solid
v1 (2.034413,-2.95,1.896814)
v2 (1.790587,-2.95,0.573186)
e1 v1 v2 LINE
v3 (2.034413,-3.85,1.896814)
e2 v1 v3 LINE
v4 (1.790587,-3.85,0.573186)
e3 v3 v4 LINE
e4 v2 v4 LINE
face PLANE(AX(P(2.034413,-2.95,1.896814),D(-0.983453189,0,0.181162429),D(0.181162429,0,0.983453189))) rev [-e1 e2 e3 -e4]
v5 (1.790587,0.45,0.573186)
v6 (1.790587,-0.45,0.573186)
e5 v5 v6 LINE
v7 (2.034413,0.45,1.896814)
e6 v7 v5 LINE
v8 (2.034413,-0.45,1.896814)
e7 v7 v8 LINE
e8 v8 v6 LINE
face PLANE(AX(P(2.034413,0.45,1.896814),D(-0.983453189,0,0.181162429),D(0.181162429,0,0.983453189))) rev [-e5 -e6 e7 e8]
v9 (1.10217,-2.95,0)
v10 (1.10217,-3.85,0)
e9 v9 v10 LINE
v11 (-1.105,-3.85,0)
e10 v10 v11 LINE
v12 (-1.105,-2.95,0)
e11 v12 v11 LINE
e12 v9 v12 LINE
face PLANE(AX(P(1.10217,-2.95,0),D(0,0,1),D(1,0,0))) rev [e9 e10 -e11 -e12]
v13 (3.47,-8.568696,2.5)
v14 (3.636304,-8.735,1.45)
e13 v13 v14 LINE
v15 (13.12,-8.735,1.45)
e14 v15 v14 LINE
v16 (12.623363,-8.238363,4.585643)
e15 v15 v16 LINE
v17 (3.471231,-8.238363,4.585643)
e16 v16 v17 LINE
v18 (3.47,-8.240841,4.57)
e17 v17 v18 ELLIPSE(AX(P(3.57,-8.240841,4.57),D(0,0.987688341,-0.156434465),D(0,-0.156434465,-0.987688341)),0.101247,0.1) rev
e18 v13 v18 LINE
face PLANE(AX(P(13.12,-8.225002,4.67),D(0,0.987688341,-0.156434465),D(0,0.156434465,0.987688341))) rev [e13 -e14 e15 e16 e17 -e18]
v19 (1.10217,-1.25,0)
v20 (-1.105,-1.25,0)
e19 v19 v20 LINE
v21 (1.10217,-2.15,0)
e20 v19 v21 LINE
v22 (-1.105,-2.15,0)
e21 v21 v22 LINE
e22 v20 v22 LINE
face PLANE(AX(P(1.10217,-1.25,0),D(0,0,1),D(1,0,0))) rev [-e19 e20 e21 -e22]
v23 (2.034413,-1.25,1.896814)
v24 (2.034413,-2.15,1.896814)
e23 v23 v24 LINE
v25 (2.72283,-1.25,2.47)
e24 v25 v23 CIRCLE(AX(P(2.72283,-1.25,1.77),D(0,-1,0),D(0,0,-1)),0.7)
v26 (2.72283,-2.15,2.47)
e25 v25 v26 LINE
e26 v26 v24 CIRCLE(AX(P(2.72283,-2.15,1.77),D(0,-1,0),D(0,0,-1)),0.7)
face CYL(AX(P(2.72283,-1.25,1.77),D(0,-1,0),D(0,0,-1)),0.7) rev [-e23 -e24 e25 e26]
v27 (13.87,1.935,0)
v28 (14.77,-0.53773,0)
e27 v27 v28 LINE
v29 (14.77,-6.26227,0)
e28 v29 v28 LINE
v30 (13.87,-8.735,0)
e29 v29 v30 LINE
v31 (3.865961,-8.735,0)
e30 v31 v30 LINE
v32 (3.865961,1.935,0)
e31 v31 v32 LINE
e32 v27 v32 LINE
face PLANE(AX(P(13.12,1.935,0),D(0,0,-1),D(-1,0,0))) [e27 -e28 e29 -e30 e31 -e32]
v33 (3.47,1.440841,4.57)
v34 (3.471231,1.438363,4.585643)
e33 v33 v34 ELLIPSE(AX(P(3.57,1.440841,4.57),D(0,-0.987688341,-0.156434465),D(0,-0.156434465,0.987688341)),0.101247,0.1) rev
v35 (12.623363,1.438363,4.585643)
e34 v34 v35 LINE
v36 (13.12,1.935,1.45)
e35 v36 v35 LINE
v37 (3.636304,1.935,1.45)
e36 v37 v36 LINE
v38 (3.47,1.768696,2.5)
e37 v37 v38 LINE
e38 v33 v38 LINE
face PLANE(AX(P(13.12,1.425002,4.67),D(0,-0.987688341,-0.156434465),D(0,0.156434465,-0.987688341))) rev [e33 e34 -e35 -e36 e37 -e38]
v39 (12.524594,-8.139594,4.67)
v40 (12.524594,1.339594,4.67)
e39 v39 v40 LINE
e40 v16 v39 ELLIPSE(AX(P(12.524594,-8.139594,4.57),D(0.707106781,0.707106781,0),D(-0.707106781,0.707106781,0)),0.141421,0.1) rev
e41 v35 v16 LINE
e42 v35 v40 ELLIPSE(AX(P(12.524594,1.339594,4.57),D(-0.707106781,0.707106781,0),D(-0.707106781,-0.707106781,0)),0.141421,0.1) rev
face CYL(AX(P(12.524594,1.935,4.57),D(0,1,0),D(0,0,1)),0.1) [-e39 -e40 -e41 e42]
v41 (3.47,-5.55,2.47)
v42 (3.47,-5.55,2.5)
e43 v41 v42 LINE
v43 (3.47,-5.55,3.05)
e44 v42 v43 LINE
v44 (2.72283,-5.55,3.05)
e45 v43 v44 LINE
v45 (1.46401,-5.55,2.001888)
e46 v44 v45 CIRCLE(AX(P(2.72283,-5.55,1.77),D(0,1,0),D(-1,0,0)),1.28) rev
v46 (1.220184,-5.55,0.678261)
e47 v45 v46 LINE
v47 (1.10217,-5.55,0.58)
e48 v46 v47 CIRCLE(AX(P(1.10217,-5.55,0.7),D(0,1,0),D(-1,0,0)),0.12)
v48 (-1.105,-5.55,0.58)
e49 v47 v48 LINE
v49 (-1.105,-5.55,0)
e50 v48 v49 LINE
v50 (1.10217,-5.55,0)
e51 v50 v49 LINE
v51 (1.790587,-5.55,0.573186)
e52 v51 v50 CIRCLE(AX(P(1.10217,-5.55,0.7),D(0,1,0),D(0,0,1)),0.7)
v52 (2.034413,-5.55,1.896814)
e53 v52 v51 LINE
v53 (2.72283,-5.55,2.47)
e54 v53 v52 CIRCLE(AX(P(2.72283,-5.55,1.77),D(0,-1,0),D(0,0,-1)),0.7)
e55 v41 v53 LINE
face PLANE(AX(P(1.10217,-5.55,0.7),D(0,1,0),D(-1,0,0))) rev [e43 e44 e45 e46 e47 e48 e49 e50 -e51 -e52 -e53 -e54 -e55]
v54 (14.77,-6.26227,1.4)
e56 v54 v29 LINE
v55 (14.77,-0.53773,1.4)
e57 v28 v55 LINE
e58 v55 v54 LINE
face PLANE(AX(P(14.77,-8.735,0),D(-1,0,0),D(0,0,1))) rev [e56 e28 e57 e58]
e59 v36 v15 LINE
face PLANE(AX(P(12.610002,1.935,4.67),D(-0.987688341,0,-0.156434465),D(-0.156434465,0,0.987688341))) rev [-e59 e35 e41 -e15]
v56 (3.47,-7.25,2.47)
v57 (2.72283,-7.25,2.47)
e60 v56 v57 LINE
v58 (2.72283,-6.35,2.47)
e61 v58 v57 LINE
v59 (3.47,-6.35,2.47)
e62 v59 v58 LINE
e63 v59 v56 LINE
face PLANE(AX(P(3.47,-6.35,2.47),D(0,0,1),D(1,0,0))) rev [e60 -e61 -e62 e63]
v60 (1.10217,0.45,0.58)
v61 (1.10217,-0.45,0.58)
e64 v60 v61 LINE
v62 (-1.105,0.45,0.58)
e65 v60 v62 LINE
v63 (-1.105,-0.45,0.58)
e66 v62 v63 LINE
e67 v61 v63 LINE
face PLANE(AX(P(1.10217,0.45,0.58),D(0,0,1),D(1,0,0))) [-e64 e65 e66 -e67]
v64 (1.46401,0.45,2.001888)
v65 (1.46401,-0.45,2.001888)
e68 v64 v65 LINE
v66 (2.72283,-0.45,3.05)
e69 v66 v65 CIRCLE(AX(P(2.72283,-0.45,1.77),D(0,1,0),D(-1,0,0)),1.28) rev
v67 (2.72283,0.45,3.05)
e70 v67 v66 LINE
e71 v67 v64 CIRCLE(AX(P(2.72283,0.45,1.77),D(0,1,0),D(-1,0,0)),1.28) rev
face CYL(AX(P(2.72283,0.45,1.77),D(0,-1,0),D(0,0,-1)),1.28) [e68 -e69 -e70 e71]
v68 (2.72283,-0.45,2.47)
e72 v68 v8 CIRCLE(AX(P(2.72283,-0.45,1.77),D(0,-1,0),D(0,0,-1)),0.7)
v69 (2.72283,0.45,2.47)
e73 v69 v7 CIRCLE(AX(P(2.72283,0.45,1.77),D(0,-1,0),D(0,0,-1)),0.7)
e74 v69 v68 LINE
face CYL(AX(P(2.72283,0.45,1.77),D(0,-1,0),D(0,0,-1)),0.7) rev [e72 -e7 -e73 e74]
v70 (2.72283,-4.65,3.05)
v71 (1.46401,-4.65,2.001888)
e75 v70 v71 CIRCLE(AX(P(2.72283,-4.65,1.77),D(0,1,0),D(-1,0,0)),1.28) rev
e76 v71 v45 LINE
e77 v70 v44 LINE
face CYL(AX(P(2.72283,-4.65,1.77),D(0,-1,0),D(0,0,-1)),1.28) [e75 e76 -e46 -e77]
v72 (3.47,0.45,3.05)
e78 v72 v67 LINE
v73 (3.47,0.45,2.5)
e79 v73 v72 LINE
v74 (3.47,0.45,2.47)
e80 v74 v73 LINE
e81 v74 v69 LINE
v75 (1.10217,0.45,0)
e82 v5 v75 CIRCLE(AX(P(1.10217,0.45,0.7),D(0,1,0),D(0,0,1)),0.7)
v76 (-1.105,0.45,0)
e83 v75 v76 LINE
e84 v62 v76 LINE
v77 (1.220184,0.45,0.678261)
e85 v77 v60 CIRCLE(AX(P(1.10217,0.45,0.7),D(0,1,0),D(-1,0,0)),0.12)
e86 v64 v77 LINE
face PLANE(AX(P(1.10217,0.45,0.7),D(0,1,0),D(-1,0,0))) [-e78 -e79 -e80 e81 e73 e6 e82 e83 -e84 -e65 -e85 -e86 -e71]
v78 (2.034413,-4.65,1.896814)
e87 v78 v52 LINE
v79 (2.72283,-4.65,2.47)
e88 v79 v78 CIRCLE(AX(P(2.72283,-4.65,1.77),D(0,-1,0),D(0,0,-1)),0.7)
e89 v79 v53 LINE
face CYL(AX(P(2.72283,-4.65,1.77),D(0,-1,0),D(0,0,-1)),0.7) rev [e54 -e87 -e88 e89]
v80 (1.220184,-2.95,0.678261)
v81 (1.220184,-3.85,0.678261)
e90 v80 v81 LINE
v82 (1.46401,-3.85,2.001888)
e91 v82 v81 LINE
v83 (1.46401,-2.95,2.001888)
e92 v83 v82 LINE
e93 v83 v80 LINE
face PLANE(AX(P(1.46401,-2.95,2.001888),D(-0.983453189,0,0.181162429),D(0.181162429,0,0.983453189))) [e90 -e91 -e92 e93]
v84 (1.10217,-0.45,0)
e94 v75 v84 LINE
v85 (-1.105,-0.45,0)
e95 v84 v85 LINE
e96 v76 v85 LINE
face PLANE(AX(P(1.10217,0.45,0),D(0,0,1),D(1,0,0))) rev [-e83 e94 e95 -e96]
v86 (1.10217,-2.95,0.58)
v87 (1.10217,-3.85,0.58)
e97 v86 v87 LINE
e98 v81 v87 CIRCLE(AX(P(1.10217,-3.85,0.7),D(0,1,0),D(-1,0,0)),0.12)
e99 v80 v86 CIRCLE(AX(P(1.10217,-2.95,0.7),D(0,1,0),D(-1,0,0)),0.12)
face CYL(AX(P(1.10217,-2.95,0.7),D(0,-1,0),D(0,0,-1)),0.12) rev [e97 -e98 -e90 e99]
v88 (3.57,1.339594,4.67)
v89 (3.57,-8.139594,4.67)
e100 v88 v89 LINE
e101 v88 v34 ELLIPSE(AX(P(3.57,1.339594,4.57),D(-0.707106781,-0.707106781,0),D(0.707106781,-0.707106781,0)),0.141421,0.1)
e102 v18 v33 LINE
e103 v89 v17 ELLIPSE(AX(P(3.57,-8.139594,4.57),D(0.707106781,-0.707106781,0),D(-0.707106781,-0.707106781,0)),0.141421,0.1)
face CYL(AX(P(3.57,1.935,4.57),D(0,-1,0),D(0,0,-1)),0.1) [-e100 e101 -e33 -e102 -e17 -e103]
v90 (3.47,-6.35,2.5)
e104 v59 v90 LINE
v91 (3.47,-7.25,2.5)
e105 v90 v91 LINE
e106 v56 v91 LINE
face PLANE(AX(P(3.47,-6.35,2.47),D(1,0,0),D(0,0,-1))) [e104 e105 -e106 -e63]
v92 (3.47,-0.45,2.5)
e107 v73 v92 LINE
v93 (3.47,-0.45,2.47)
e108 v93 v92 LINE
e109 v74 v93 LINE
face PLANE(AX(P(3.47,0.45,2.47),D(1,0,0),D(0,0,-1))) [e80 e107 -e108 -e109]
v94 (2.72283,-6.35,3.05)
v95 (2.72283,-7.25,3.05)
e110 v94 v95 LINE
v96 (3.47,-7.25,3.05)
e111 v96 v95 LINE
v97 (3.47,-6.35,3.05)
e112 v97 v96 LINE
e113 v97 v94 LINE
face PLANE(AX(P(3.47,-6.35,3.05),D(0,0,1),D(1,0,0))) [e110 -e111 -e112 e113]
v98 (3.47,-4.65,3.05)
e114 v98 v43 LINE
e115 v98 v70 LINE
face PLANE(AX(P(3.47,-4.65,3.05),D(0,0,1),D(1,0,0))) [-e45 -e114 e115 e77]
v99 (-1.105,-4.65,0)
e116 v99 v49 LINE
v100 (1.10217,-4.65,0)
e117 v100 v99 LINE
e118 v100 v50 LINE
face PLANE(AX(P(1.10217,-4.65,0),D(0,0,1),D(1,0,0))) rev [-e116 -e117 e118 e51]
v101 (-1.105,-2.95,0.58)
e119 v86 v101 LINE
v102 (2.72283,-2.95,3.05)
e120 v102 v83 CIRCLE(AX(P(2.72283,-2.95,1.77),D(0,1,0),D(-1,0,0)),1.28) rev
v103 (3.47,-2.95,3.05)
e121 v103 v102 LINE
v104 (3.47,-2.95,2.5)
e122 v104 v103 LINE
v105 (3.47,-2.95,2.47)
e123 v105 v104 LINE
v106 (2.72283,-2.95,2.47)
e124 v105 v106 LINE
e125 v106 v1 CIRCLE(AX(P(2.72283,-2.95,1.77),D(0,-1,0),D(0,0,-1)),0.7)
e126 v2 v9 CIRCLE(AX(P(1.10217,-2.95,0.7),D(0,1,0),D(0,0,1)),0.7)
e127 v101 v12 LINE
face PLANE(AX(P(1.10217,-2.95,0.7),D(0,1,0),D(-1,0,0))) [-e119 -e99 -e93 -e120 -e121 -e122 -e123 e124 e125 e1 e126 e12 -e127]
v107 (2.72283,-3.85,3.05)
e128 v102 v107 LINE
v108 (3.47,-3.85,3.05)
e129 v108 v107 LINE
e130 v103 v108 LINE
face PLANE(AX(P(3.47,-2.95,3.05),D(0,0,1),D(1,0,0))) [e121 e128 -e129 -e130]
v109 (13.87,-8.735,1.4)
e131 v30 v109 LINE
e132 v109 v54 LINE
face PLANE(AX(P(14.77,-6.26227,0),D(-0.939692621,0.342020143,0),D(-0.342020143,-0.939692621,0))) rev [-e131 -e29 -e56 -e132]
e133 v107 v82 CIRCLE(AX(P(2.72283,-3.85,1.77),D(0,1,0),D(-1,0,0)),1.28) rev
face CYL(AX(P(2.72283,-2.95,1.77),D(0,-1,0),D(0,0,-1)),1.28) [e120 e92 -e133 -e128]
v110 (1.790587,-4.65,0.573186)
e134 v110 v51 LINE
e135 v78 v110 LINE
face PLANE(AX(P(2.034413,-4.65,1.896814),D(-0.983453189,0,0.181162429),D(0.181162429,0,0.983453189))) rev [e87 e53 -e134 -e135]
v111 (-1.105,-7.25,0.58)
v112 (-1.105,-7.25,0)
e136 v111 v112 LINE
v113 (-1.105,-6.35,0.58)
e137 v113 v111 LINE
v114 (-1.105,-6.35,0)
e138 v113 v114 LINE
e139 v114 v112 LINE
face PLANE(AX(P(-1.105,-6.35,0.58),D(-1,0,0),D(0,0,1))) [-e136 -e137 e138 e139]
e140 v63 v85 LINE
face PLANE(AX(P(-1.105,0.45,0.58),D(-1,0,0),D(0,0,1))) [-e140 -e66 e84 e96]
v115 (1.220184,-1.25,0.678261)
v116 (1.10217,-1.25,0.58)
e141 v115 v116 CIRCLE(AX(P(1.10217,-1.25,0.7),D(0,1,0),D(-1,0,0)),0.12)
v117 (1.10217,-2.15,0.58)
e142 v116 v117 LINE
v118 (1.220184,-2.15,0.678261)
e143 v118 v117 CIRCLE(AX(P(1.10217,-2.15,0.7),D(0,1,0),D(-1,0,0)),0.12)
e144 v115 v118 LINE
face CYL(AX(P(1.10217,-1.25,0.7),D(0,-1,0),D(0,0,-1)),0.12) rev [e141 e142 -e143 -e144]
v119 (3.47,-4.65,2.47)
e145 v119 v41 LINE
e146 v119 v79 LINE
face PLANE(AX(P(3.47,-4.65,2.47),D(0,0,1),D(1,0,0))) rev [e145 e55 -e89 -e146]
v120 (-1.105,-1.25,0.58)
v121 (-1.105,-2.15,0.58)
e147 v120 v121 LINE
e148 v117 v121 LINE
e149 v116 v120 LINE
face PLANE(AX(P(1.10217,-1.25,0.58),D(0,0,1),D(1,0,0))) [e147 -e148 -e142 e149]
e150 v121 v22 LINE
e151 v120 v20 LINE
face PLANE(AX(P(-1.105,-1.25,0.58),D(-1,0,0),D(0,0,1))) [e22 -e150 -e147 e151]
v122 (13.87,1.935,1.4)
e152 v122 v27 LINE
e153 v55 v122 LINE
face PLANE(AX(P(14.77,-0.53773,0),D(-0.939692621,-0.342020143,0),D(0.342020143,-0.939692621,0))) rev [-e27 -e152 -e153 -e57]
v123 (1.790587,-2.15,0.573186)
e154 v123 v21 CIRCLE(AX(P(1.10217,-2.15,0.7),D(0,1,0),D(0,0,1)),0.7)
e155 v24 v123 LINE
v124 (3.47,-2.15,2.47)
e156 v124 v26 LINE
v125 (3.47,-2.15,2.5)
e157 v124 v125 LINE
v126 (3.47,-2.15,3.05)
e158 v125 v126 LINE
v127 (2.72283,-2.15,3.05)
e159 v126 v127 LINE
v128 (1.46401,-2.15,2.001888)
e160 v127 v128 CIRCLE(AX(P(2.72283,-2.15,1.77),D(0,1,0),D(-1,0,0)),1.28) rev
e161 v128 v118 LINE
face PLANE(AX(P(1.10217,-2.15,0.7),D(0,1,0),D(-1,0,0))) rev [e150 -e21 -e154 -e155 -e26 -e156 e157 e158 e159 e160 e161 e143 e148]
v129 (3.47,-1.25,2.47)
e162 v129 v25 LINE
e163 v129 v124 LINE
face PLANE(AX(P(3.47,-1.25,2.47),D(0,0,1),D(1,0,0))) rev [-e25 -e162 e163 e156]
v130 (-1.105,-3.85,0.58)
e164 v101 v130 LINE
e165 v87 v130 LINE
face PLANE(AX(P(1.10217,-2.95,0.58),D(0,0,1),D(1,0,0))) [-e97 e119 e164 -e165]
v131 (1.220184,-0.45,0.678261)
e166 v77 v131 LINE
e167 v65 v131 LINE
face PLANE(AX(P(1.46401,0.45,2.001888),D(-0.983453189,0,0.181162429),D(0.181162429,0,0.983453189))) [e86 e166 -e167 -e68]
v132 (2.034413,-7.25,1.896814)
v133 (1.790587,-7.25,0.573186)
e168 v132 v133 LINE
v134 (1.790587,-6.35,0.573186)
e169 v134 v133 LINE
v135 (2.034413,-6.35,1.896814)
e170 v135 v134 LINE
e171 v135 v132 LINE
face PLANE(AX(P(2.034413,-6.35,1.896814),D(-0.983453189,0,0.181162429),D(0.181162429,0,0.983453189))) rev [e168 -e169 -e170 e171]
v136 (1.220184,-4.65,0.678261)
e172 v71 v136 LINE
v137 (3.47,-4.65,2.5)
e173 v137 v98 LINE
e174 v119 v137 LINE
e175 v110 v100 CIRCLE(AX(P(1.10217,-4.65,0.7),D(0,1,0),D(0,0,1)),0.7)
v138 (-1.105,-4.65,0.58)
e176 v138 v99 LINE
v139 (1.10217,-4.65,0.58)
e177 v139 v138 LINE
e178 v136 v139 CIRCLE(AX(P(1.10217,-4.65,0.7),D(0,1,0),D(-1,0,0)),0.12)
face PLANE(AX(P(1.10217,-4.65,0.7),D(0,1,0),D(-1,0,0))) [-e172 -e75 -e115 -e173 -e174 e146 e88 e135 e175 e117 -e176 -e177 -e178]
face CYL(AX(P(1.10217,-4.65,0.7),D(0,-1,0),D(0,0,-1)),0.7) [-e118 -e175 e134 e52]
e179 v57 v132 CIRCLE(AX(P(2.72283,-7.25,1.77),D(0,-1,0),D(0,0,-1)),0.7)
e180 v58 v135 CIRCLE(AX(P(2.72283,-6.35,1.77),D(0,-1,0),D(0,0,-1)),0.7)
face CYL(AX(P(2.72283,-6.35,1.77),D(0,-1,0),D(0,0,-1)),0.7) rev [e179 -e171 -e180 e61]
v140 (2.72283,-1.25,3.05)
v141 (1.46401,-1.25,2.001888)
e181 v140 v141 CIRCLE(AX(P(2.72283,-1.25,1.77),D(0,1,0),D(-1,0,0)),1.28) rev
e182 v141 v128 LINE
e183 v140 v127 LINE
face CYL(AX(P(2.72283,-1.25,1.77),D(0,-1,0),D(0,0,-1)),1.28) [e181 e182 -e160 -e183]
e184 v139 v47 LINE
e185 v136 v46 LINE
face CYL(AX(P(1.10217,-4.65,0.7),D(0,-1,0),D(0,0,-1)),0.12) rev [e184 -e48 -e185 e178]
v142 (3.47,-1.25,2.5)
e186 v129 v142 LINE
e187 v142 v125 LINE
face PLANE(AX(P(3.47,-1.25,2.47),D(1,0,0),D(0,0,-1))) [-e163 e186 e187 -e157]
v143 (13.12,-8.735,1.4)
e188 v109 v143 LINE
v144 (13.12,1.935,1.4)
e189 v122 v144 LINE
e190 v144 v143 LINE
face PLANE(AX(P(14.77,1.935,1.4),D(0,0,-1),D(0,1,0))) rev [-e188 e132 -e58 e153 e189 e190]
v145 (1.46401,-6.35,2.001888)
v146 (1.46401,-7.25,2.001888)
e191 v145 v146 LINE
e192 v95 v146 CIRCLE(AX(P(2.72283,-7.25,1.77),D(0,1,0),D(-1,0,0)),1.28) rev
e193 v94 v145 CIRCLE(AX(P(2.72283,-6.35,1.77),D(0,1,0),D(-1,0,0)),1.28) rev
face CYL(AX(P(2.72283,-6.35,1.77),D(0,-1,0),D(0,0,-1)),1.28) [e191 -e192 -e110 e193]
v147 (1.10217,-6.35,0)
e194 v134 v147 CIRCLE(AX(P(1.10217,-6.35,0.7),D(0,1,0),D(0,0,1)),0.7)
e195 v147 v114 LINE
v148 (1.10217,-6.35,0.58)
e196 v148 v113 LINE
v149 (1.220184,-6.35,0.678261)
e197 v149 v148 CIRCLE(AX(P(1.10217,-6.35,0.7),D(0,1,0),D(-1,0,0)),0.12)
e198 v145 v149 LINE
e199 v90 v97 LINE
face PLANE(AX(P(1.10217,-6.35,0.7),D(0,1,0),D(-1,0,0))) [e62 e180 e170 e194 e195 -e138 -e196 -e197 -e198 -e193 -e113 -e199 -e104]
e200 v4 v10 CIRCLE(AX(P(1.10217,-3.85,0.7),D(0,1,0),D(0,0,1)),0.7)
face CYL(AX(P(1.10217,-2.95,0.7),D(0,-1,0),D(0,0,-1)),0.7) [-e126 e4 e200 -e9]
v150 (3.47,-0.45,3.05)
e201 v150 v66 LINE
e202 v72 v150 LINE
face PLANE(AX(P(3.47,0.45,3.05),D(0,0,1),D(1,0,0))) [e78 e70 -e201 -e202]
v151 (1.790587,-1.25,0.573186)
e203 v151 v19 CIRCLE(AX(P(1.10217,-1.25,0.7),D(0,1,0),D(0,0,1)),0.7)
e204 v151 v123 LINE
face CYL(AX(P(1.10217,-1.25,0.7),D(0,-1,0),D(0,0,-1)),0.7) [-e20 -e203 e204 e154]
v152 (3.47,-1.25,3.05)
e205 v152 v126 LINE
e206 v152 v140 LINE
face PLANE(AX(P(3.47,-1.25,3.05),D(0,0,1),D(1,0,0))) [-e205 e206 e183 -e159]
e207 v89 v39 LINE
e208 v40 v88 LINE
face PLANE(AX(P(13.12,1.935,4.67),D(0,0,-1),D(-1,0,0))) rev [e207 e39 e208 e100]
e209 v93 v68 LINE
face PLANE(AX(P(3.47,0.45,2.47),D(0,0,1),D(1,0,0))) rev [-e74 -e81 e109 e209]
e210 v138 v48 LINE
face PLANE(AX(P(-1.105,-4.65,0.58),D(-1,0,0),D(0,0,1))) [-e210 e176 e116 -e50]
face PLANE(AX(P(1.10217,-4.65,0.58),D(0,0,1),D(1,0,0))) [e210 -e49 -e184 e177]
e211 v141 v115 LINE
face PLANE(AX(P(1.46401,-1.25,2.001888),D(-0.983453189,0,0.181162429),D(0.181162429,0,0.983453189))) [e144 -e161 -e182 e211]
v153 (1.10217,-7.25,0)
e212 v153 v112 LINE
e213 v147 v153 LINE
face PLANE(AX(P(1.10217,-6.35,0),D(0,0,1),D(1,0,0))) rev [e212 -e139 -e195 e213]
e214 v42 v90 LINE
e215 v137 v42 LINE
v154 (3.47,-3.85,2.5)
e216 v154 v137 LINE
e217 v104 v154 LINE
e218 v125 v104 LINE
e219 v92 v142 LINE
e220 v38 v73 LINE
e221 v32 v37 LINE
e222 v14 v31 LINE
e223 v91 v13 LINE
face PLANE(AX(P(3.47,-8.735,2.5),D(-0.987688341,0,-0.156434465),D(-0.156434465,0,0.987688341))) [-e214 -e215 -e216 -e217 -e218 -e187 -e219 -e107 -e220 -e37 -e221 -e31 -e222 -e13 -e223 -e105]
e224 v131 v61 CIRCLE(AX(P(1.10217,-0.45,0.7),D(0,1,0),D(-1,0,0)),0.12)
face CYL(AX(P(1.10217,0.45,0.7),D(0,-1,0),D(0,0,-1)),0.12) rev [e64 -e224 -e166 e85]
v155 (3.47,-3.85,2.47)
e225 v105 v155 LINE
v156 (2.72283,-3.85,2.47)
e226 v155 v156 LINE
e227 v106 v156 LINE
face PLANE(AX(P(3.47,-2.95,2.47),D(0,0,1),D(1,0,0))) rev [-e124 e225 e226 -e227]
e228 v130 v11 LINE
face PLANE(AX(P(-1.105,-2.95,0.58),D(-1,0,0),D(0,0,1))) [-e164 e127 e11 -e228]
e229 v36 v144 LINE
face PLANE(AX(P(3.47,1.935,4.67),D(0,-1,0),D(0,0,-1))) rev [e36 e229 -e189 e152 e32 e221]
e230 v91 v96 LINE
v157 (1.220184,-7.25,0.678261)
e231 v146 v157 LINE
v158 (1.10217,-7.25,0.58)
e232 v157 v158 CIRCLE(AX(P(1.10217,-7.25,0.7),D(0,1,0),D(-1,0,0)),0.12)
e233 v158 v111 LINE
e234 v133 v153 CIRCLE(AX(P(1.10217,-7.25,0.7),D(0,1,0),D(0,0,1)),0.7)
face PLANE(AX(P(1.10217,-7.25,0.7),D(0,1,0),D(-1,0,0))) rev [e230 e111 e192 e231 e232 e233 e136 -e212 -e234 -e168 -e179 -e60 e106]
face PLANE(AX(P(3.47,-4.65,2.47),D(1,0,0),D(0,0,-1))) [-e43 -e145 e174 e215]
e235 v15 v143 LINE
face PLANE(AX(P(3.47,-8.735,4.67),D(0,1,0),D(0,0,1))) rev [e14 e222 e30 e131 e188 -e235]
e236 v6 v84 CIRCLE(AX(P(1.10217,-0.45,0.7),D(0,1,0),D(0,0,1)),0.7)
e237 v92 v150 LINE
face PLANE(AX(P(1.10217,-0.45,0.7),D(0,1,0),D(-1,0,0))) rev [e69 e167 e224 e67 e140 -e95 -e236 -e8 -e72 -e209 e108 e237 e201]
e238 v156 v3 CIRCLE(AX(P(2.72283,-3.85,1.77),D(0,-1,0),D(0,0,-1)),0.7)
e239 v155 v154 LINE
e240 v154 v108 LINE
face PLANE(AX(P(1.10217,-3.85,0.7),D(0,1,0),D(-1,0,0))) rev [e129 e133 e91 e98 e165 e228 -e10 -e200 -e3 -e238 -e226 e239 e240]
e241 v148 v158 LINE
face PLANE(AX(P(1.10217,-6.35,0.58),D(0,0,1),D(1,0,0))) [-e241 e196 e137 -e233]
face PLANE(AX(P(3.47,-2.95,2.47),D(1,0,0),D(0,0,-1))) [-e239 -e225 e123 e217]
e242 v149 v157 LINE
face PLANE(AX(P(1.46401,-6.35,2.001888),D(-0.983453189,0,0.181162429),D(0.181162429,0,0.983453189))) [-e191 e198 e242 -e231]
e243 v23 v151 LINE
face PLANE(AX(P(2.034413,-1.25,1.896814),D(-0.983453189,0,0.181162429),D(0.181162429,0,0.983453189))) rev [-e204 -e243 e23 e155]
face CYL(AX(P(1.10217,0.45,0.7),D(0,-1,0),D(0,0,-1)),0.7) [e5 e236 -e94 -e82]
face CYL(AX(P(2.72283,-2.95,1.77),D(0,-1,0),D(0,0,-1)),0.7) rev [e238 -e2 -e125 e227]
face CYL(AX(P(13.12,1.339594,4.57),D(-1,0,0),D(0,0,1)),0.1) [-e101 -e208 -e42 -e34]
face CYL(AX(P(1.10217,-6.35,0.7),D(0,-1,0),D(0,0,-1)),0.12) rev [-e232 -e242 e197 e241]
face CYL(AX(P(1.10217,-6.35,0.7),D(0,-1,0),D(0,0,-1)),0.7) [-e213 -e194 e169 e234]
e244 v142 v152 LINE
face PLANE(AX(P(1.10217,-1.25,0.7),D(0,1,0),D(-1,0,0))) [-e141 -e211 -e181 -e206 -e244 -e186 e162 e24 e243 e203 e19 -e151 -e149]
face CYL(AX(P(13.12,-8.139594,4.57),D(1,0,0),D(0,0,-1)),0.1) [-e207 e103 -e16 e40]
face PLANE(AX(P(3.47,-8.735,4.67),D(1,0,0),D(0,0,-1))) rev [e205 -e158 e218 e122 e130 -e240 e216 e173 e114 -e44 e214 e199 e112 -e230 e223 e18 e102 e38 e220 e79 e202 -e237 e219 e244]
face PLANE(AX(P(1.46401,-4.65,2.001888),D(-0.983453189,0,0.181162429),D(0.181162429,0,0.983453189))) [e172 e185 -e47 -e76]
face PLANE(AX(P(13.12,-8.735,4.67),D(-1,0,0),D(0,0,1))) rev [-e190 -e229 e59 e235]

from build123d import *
from OCP.BRepFilletAPI import BRepFilletAPI_MakeChamfer

# Parameters (mm, degrees)
SKETCH_1_W             = 9.65
SKETCH_1_H             = 10.67
EXTRUDE_1_DEPTH        = 4.67
SKETCH_2_W             = 1.4
SKETCH_2_H             = 10.67
EXTRUDE_2_DEPTH        = 1.65
CHAMFER_1_SIZE         = 0.9
CHAMFER_1_SIZE2        = 2.472729678
CHAMFER_2_SIZE         = 3.22
CHAMFER_2_SIZE2        = 0.509997898
CHAMFER_3_SIZE         = 2.5
CHAMFER_3_SIZE2        = 0.395961101
FILLET_1_R             = 0.1
EXTRUDE_2_2_DEPTH      = 0.45
PATTERN_LINEAR_1_COUNT = 5
PATTERN_LINEAR_1_PITCH = 1.7


with BuildPart() as part:
    # Эскиз1 → Бобышка-Вытянуть1 (new body)
    with BuildSketch(Plane.XY):
        Rectangle(SKETCH_1_W, SKETCH_1_H)
    extrude(amount=EXTRUDE_1_DEPTH)

    # Эскиз2 → Extrude 2 (add)
    with BuildSketch(Plane(origin=(4.825, 0, 0), x_dir=(0, 0, -1), z_dir=(1, 0, 0))):
        with Locations((-0.7, 0)):
            Rectangle(SKETCH_2_W, SKETCH_2_H)
    extrude(amount=EXTRUDE_2_DEPTH)

    # Фаска1: one chamfer whose edges measure the first distance from different faces: ONE call of the kernel's chamfer builder (chamfer() names one face for all edges)
    chamfer_1_edges_1 = [part.edges().sort_by_distance(p)[0] for p in [
        (6.475, 5.335, 0.7),
    ]]
    chamfer_1_side_1 = [part.faces().sort_by_distance(p)[0] for p in [
        (0.275490496, 5.335, 2.255278414),
    ]]
    chamfer_1_edges_2 = [part.edges().sort_by_distance(p)[0] for p in [
        (6.475, -5.335, 0.7),
    ]]
    chamfer_1_side_2 = [part.faces().sort_by_distance(p)[0] for p in [
        (0.275490496, -5.335, 2.255278414),
    ]]
    chamfer_1 = BRepFilletAPI_MakeChamfer(part.part.solid().wrapped)
    for e in chamfer_1_edges_1:
        chamfer_1.Add(CHAMFER_1_SIZE, CHAMFER_1_SIZE2, e.wrapped, chamfer_1_side_1[0].wrapped)  # the first distance lies on this face
    for e in chamfer_1_edges_2:
        chamfer_1.Add(CHAMFER_1_SIZE, CHAMFER_1_SIZE2, e.wrapped, chamfer_1_side_2[0].wrapped)  # the first distance lies on this face
    add(Compound.cast(chamfer_1.Shape()), mode=Mode.REPLACE)

    # Фаска2: one chamfer whose edges measure the first distance from different faces: ONE call of the kernel's chamfer builder (chamfer() names one face for all edges)
    chamfer_2_edges_1 = [part.edges().sort_by_distance(p)[0] for p in [
        (0, -5.335, 4.67),
    ]]
    chamfer_2_side_1 = [part.faces().sort_by_distance(p)[0] for p in [
        (0.118398369, -5.335, 2.29777282),
    ]]
    chamfer_2_edges_2 = [part.edges().sort_by_distance(p)[0] for p in [
        (0, 5.335, 4.67),
    ]]
    chamfer_2_side_2 = [part.faces().sort_by_distance(p)[0] for p in [
        (0.118398369, 5.335, 2.29777282),
    ]]
    chamfer_2_edges_3 = [part.edges().sort_by_distance(p)[0] for p in [
        (4.825, 0, 4.67),
    ]]
    chamfer_2_side_3 = [part.faces().sort_by_distance(p)[0] for p in [
        (4.825, 0, 3.035),
    ]]
    chamfer_2 = BRepFilletAPI_MakeChamfer(part.part.solid().wrapped)
    for e in chamfer_2_edges_1:
        chamfer_2.Add(CHAMFER_2_SIZE, CHAMFER_2_SIZE2, e.wrapped, chamfer_2_side_1[0].wrapped)  # the first distance lies on this face
    for e in chamfer_2_edges_2:
        chamfer_2.Add(CHAMFER_2_SIZE, CHAMFER_2_SIZE2, e.wrapped, chamfer_2_side_2[0].wrapped)  # the first distance lies on this face
    for e in chamfer_2_edges_3:
        chamfer_2.Add(CHAMFER_2_SIZE, CHAMFER_2_SIZE2, e.wrapped, chamfer_2_side_3[0].wrapped)  # the first distance lies on this face
    add(Compound.cast(chamfer_2.Shape()), mode=Mode.REPLACE)

    # Фаска3
    chamfer_3_edges = [part.edges().sort_by_distance(p)[0] for p in [
        (-4.825, 0, 0),
    ]]
    chamfer_3_side = [part.faces().sort_by_distance(p)[0] for p in [
        (-4.825, 0, 2.292002655),
    ]]
    chamfer(chamfer_3_edges, length=CHAMFER_3_SIZE, length2=CHAMFER_3_SIZE2, reference=chamfer_3_side[0])

    # Скругление1
    fillet_1_edges = [part.edges().sort_by_distance(p)[0] for p in [
        (-4.825, 0, 4.67),
        (4.315002102, 0, 4.67),
        (-0.254998949, 4.825002102, 4.67),
        (-0.254998949, -4.825002102, 4.67),
    ]]
    fillet(fillet_1_edges, radius=FILLET_1_R)

    # Эскиз6 → Extrude 2 2 (add, symmetric)
    with BuildSketch(Plane(origin=(0, 3.4, 0), x_dir=(-1, 0, 0), z_dir=(0, 1, 0))):
        with BuildLine():
            Line((4.825, 2.47), (5.572169718, 2.47))
            ThreePointArc((5.572169718, 2.47), (6.020070605, 2.307944974), (6.26058695, 1.896813701))
            Line((6.26058695, 1.896813701), (6.50441305, 0.573186299))
            ThreePointArc((6.50441305, 0.573186299), (6.744929395, 0.162055026), (7.192830282, 0))
            Line((7.192830282, 0), (9.4, 0))
            Line((9.4, 0), (9.4, 0.58))
            Line((9.4, 0.58), (7.192830282, 0.58))
            ThreePointArc((7.192830282, 0.58), (7.116047273, 0.607780862), (7.074815899, 0.678260508))
            Line((7.074815899, 0.678260508), (6.830989799, 2.00188791))
            ThreePointArc((6.830989799, 2.00188791), (6.391188483, 2.75367081), (5.572169718, 3.05))
            Line((5.572169718, 3.05), (4.825, 3.05))
            Line((4.825, 3.05), (4.825, 2.47))
        make_face()
    extrude_2_2 = extrude(amount=EXTRUDE_2_2_DEPTH, both=True)

    # Линейный массив1: Extrude 2 2 ×5
    with Locations(*[(0, -i * PATTERN_LINEAR_1_PITCH, 0) for i in range(1, PATTERN_LINEAR_1_COUNT)]):
        add(extrude_2_2)


with BuildPart() as part_1:
    # Move Body 1: read off the stored shape, not the designer's step
    # Move Body 1: moved
    add(part.part.moved(Location((8.295, -3.4, 0))))


solid = part_1.part
